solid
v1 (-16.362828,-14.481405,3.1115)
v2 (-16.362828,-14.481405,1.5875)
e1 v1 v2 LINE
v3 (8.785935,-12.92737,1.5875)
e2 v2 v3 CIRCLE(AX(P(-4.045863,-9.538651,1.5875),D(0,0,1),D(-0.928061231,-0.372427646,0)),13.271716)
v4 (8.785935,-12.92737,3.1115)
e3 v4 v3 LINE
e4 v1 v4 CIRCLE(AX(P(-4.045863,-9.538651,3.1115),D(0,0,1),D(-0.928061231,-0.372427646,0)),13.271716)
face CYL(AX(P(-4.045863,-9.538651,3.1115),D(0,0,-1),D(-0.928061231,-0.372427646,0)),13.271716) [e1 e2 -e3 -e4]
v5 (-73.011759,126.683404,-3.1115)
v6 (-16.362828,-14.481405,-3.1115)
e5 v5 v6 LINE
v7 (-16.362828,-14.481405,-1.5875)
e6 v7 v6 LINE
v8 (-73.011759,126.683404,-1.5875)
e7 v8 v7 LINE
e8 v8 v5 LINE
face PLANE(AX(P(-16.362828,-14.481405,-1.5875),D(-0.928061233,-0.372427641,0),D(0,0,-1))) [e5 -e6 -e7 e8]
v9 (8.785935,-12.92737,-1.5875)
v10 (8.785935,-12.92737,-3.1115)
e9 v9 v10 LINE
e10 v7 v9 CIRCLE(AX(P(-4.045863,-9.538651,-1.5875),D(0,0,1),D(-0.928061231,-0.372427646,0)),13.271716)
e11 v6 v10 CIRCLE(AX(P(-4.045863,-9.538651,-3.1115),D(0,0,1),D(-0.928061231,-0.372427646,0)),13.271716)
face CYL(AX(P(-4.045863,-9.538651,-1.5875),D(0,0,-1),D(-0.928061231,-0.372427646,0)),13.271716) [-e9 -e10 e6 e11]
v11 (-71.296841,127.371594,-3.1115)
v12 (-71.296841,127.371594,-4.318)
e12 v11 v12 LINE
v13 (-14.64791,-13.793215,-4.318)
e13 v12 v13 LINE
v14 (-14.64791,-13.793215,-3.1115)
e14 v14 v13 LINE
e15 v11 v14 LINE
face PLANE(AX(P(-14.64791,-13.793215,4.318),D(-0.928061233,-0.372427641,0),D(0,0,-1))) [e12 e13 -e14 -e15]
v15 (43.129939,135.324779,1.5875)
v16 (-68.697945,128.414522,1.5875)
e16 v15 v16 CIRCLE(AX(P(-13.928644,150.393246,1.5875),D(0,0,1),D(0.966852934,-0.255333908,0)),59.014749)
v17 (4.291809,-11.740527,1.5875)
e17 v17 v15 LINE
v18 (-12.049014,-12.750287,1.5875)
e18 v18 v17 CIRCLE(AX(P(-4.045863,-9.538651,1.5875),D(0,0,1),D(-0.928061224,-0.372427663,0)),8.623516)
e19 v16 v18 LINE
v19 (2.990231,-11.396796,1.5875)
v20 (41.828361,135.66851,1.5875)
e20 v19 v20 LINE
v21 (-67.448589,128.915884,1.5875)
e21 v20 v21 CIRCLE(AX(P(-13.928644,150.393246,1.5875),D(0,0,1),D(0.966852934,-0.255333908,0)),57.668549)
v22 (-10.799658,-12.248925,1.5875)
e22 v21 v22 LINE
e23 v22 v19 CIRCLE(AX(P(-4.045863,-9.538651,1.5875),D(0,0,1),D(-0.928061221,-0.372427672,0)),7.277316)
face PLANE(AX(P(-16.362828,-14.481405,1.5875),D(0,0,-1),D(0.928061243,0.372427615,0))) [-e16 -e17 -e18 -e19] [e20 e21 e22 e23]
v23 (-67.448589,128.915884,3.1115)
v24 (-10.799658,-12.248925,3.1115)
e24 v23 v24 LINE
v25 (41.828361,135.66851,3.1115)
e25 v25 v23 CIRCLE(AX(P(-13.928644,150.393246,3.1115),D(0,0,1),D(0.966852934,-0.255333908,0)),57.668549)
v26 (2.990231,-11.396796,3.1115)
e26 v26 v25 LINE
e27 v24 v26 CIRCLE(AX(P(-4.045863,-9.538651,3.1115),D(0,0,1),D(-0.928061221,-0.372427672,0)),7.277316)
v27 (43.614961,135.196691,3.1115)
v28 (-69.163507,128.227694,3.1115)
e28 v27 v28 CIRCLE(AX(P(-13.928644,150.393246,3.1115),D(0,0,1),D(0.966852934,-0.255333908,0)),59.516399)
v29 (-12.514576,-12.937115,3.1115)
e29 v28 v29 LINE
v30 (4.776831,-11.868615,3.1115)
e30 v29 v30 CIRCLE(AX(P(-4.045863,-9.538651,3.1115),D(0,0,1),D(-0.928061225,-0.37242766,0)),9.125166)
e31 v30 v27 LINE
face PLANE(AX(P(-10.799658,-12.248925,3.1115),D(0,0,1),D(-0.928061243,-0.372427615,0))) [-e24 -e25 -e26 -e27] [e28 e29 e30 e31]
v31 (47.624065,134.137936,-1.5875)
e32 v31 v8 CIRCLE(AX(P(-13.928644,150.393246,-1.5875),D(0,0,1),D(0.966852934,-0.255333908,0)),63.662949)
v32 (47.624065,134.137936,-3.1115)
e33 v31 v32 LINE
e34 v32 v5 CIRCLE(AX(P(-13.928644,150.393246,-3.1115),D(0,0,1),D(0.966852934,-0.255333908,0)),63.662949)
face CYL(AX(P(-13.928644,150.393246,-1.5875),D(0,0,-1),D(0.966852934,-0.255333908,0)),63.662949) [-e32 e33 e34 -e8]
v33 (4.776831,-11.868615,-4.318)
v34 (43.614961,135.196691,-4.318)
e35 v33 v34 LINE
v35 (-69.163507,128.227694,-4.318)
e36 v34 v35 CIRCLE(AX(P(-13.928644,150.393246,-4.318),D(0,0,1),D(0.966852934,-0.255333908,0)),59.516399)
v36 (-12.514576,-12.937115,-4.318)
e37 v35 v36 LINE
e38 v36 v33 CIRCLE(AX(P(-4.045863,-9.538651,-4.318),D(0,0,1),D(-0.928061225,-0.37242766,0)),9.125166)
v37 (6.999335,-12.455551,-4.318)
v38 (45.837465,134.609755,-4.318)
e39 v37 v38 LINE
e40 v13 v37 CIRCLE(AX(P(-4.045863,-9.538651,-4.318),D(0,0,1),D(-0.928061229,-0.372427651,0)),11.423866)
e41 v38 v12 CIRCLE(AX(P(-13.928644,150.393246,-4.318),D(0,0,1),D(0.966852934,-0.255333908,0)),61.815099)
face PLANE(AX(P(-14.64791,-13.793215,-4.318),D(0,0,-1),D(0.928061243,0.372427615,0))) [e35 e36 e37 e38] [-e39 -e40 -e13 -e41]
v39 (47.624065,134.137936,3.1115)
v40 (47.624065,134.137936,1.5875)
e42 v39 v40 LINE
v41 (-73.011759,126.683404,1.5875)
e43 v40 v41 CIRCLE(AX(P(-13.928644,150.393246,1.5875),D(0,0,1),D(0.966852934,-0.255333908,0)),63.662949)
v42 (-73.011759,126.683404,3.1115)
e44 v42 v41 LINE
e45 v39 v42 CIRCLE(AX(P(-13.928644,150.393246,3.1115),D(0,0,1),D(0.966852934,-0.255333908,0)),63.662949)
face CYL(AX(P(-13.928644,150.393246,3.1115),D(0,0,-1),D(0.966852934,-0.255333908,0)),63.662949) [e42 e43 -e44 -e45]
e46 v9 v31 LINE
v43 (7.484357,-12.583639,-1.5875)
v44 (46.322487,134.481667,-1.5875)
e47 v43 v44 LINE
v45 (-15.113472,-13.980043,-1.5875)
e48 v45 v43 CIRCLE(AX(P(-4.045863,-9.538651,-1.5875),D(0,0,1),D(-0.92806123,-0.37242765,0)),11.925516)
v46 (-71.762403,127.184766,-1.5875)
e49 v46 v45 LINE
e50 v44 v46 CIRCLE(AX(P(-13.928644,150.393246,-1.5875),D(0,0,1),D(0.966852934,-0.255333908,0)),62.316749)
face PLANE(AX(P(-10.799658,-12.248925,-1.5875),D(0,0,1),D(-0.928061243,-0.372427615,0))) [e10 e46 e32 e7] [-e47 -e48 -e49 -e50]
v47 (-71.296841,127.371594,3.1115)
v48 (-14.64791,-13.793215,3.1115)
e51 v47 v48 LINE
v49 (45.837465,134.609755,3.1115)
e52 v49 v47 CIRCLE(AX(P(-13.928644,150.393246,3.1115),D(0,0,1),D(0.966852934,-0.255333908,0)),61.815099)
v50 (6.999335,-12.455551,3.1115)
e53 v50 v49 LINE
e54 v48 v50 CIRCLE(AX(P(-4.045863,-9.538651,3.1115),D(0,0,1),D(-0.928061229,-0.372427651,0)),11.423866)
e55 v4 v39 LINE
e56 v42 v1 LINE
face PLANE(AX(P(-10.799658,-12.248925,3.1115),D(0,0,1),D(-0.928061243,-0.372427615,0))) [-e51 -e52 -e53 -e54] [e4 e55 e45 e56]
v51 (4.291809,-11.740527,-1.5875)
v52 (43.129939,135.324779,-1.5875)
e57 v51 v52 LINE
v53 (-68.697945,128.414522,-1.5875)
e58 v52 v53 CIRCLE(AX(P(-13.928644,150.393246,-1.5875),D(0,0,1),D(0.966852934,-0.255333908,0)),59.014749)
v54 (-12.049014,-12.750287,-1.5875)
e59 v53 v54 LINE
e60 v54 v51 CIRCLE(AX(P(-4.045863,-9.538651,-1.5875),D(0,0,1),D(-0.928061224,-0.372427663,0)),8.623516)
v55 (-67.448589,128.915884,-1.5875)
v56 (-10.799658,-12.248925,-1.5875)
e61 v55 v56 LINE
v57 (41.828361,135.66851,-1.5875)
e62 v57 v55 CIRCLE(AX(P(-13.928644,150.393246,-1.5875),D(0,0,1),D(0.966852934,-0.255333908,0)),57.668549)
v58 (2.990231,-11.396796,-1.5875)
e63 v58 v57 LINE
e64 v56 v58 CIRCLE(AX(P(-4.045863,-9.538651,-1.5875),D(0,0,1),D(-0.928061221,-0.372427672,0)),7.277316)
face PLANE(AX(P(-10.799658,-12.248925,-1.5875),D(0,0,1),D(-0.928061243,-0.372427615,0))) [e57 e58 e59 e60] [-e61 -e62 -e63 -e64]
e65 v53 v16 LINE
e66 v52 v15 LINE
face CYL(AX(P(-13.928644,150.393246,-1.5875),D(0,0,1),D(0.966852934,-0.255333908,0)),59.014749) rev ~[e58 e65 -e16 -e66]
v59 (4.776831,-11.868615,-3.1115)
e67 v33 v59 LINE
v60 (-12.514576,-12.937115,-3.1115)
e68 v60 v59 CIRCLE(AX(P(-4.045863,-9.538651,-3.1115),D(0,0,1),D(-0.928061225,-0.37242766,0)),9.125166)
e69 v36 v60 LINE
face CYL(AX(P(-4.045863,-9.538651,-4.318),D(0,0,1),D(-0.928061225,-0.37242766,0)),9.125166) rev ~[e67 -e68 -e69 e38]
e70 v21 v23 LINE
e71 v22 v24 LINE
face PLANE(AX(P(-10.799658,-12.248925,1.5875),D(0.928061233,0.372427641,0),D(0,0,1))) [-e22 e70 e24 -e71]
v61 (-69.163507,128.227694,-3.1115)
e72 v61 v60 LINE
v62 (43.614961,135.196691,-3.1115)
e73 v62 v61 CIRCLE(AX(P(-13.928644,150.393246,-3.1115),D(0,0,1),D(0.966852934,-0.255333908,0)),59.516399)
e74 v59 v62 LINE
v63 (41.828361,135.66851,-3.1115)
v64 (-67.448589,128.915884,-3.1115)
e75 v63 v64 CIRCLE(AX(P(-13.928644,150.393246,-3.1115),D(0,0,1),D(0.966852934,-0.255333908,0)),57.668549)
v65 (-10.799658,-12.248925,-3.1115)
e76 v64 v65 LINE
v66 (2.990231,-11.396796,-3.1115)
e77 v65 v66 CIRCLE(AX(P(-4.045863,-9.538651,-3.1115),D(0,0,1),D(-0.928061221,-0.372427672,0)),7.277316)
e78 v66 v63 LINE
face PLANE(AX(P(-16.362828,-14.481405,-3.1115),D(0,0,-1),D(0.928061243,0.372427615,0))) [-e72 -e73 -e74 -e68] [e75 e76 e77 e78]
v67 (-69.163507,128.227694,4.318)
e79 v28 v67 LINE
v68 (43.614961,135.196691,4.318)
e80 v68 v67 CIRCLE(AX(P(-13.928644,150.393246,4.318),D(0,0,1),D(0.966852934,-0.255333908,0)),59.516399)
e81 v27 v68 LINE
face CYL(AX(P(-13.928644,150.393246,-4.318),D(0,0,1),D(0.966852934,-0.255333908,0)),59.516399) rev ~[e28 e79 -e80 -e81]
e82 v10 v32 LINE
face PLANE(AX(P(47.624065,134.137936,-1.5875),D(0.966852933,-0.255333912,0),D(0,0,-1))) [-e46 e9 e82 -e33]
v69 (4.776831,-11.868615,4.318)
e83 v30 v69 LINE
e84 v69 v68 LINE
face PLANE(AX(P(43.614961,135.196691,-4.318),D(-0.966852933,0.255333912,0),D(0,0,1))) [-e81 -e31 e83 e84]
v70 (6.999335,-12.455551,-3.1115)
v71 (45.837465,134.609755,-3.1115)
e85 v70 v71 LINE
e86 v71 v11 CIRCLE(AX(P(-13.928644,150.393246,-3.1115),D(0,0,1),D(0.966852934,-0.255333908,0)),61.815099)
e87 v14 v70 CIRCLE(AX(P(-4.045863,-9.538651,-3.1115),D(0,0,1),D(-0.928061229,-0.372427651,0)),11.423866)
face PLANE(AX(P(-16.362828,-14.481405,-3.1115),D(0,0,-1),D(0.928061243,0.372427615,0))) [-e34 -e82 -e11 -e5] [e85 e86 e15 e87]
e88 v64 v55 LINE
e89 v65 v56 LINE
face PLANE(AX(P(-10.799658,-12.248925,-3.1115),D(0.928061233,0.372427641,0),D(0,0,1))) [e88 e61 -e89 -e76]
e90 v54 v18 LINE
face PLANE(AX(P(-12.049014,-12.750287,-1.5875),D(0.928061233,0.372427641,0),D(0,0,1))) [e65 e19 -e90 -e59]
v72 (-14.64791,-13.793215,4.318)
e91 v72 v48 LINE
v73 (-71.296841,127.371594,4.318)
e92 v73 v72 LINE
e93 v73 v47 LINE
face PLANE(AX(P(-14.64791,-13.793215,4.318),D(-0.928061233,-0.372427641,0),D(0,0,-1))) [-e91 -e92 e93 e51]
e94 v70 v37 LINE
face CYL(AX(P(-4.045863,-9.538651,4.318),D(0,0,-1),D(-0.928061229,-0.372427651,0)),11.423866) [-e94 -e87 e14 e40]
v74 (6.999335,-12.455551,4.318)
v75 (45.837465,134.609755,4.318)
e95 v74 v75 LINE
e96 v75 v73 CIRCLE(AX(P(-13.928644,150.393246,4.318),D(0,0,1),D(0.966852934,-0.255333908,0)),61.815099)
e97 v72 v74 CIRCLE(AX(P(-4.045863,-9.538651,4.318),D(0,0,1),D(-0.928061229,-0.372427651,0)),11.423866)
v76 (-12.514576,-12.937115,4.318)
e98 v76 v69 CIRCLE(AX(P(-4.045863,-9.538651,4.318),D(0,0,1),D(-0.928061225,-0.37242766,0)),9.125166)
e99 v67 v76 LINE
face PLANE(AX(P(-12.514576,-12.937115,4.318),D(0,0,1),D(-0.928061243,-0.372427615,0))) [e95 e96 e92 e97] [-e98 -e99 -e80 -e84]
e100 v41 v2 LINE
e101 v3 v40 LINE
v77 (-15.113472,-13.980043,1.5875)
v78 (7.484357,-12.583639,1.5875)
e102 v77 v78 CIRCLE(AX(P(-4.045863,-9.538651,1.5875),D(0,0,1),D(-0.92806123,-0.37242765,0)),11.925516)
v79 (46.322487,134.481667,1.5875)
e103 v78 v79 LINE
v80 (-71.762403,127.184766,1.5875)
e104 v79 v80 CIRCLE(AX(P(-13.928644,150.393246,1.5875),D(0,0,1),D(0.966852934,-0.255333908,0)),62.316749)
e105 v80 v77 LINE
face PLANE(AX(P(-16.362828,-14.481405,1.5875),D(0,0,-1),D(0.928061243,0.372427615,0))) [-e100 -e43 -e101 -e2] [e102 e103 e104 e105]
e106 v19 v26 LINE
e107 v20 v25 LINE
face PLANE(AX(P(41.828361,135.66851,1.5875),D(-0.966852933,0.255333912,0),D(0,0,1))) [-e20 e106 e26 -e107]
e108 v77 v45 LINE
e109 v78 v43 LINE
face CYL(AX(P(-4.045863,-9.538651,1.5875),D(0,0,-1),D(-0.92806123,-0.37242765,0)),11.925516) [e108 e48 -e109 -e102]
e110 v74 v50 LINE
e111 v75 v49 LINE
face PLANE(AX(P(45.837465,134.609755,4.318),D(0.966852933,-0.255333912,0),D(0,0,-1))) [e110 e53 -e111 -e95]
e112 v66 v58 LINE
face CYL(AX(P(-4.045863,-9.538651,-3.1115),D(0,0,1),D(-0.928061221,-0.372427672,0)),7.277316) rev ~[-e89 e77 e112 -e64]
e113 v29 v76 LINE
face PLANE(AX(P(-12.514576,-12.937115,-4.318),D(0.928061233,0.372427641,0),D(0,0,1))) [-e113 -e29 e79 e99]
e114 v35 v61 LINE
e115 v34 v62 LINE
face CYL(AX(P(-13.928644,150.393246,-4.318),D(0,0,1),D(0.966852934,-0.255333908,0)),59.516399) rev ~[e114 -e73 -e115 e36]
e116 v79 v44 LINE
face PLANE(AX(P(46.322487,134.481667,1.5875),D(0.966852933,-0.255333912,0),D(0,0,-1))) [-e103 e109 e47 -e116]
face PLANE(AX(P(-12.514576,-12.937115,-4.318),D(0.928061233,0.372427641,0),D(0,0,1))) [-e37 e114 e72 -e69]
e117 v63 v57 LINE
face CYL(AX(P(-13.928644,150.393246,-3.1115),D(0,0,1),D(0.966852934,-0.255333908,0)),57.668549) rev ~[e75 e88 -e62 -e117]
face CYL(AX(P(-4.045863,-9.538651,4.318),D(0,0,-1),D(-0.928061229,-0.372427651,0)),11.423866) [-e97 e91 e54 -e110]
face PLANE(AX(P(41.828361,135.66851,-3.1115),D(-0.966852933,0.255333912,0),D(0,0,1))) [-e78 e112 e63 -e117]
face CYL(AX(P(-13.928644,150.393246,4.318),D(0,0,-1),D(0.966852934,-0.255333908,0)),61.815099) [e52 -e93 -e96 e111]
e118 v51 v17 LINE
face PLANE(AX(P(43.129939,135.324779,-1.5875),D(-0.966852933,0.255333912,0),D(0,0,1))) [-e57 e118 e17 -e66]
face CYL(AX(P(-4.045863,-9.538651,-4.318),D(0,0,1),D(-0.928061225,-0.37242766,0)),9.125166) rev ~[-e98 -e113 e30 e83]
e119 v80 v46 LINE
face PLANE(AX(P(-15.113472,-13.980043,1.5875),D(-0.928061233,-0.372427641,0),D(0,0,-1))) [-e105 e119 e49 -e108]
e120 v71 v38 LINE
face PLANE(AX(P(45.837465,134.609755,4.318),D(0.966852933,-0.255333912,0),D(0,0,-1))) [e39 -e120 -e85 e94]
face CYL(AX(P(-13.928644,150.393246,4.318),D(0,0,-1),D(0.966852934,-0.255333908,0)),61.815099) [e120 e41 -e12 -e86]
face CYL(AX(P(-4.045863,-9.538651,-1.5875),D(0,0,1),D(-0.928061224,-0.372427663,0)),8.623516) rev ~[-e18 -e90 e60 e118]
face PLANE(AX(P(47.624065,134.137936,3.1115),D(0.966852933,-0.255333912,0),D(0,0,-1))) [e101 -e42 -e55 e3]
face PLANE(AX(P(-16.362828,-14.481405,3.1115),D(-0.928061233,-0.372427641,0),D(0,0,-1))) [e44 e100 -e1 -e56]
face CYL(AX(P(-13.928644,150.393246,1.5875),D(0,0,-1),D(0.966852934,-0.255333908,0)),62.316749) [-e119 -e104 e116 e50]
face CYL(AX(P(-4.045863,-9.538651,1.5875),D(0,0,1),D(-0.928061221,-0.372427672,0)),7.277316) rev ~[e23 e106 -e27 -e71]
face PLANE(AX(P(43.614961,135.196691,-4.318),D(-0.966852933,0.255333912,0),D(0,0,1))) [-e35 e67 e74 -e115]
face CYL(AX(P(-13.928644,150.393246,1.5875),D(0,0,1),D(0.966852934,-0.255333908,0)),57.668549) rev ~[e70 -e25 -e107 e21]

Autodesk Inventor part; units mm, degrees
ref_plane "Work Plane2" through (-4.045863, -9.538651, 0) normal (-1, 0, 0) x (0, 0, 1)
ref_plane "Work Plane3" through (-13.928644, 150.393246, 0) normal (0.357395, -0.9339533, 0) x (0, 0, 1)
sketch "Path" plane through (0, 0, 0) normal (0, 0, 1) x (1, 0, 0)
  arc A0 (-13.581243, -13.365165) -> (5.888083, -12.162083) centre (-4.045863, -9.538651) ccw
  arc A1 (44.726213, 134.903223) -> (-70.230174, 127.799644) centre (-13.928644, 150.393246) ccw
  line L0 (44.726213, 134.903223) -> (5.888083, -12.162083)
  line L1 (-13.581243, -13.365165) -> (-70.230174, 127.799644)
  dimension "d31" = 5.9944
ref_plane "Section Plane" through (5.888083, -12.162083, 0) normal (0.2553339, 0.9668529, 0) x (0, 0, 1)
sketch "Section Sketch" plane through (5.888083, -12.162083, 0) normal (0.2553339, 0.9668529, 0) x (0, 0, 1)
  line L0 (-4.318, -1.14935) -> (4.318, -1.14935)
  line L1 (4.318, -1.14935) -> (4.318, 1.14935)
  line L2 (4.318, 1.14935) -> (-4.318, 1.14935)
  line L3 (-4.318, 1.14935) -> (-4.318, -1.14935)
  line L4 (-1.5875, -1.651) -> (1.5875, -1.651)
  line L5 (1.5875, -1.651) -> (1.5875, 1.651)
  line L6 (1.5875, 1.651) -> (-1.5875, 1.651)
  line L7 (-1.5875, 1.651) -> (-1.5875, -1.651)
  line L8 (-1.5875, 0) -> (1.5875, 0) construction
  line L9 (-3.1115, -2.9972) -> (-1.5875, -2.9972)
  line L10 (-1.5875, -2.9972) -> (-1.5875, 2.9972)
  line L11 (-1.5875, 2.9972) -> (-3.1115, 2.9972)
  line L12 (-3.1115, 2.9972) -> (-3.1115, -2.9972)
  line L13 (1.5875, -2.9972) -> (3.1115, -2.9972)
  line L14 (3.1115, -2.9972) -> (3.1115, 2.9972)
  line L15 (3.1115, 2.9972) -> (1.5875, 2.9972)
  line L16 (1.5875, 2.9972) -> (1.5875, -2.9972)
  line L17 (-4.318, 0) -> (4.318, 0) construction
  point P0 (0, 0)
  point P1 (0, 0)
  dimension "d21" = 2.2987
  dimension "d22" = 3.302
  dimension "d23" = 3.175
  dimension "d24" = 1.524
  dimension "d31" = 5.9944
  dimension "d32" = 8.636
sweep "Solid" add profiles "Section Sketch" path "Path"
pattern_of_one "Strand Pattern"
equation "\"d21\" = da_d2"
equation "\"d22\" = da_d1"
equation "\"d23\" = da_b1"
equation "\"d24\" = da_t1 + da_t2"
equation "\"d30\" = da_pt"
equation "\"da_p\" = 6.35"
equation "\"da_b1\" = 3.175"
equation "\"da_h2\" = 5.9944"
equation "\"da_h3\" = 5.207"
equation "\"da_d1\" = 3.302"
equation "\"da_d2\" = 2.2987"
equation "\"da_pt\" = 6.4008"
equation "\"da_b\" = 8.636"
equation "\"da_t1\" = 0.762"
equation "\"da_t2\" = 0.762"
properties part number "Roller Chain"
